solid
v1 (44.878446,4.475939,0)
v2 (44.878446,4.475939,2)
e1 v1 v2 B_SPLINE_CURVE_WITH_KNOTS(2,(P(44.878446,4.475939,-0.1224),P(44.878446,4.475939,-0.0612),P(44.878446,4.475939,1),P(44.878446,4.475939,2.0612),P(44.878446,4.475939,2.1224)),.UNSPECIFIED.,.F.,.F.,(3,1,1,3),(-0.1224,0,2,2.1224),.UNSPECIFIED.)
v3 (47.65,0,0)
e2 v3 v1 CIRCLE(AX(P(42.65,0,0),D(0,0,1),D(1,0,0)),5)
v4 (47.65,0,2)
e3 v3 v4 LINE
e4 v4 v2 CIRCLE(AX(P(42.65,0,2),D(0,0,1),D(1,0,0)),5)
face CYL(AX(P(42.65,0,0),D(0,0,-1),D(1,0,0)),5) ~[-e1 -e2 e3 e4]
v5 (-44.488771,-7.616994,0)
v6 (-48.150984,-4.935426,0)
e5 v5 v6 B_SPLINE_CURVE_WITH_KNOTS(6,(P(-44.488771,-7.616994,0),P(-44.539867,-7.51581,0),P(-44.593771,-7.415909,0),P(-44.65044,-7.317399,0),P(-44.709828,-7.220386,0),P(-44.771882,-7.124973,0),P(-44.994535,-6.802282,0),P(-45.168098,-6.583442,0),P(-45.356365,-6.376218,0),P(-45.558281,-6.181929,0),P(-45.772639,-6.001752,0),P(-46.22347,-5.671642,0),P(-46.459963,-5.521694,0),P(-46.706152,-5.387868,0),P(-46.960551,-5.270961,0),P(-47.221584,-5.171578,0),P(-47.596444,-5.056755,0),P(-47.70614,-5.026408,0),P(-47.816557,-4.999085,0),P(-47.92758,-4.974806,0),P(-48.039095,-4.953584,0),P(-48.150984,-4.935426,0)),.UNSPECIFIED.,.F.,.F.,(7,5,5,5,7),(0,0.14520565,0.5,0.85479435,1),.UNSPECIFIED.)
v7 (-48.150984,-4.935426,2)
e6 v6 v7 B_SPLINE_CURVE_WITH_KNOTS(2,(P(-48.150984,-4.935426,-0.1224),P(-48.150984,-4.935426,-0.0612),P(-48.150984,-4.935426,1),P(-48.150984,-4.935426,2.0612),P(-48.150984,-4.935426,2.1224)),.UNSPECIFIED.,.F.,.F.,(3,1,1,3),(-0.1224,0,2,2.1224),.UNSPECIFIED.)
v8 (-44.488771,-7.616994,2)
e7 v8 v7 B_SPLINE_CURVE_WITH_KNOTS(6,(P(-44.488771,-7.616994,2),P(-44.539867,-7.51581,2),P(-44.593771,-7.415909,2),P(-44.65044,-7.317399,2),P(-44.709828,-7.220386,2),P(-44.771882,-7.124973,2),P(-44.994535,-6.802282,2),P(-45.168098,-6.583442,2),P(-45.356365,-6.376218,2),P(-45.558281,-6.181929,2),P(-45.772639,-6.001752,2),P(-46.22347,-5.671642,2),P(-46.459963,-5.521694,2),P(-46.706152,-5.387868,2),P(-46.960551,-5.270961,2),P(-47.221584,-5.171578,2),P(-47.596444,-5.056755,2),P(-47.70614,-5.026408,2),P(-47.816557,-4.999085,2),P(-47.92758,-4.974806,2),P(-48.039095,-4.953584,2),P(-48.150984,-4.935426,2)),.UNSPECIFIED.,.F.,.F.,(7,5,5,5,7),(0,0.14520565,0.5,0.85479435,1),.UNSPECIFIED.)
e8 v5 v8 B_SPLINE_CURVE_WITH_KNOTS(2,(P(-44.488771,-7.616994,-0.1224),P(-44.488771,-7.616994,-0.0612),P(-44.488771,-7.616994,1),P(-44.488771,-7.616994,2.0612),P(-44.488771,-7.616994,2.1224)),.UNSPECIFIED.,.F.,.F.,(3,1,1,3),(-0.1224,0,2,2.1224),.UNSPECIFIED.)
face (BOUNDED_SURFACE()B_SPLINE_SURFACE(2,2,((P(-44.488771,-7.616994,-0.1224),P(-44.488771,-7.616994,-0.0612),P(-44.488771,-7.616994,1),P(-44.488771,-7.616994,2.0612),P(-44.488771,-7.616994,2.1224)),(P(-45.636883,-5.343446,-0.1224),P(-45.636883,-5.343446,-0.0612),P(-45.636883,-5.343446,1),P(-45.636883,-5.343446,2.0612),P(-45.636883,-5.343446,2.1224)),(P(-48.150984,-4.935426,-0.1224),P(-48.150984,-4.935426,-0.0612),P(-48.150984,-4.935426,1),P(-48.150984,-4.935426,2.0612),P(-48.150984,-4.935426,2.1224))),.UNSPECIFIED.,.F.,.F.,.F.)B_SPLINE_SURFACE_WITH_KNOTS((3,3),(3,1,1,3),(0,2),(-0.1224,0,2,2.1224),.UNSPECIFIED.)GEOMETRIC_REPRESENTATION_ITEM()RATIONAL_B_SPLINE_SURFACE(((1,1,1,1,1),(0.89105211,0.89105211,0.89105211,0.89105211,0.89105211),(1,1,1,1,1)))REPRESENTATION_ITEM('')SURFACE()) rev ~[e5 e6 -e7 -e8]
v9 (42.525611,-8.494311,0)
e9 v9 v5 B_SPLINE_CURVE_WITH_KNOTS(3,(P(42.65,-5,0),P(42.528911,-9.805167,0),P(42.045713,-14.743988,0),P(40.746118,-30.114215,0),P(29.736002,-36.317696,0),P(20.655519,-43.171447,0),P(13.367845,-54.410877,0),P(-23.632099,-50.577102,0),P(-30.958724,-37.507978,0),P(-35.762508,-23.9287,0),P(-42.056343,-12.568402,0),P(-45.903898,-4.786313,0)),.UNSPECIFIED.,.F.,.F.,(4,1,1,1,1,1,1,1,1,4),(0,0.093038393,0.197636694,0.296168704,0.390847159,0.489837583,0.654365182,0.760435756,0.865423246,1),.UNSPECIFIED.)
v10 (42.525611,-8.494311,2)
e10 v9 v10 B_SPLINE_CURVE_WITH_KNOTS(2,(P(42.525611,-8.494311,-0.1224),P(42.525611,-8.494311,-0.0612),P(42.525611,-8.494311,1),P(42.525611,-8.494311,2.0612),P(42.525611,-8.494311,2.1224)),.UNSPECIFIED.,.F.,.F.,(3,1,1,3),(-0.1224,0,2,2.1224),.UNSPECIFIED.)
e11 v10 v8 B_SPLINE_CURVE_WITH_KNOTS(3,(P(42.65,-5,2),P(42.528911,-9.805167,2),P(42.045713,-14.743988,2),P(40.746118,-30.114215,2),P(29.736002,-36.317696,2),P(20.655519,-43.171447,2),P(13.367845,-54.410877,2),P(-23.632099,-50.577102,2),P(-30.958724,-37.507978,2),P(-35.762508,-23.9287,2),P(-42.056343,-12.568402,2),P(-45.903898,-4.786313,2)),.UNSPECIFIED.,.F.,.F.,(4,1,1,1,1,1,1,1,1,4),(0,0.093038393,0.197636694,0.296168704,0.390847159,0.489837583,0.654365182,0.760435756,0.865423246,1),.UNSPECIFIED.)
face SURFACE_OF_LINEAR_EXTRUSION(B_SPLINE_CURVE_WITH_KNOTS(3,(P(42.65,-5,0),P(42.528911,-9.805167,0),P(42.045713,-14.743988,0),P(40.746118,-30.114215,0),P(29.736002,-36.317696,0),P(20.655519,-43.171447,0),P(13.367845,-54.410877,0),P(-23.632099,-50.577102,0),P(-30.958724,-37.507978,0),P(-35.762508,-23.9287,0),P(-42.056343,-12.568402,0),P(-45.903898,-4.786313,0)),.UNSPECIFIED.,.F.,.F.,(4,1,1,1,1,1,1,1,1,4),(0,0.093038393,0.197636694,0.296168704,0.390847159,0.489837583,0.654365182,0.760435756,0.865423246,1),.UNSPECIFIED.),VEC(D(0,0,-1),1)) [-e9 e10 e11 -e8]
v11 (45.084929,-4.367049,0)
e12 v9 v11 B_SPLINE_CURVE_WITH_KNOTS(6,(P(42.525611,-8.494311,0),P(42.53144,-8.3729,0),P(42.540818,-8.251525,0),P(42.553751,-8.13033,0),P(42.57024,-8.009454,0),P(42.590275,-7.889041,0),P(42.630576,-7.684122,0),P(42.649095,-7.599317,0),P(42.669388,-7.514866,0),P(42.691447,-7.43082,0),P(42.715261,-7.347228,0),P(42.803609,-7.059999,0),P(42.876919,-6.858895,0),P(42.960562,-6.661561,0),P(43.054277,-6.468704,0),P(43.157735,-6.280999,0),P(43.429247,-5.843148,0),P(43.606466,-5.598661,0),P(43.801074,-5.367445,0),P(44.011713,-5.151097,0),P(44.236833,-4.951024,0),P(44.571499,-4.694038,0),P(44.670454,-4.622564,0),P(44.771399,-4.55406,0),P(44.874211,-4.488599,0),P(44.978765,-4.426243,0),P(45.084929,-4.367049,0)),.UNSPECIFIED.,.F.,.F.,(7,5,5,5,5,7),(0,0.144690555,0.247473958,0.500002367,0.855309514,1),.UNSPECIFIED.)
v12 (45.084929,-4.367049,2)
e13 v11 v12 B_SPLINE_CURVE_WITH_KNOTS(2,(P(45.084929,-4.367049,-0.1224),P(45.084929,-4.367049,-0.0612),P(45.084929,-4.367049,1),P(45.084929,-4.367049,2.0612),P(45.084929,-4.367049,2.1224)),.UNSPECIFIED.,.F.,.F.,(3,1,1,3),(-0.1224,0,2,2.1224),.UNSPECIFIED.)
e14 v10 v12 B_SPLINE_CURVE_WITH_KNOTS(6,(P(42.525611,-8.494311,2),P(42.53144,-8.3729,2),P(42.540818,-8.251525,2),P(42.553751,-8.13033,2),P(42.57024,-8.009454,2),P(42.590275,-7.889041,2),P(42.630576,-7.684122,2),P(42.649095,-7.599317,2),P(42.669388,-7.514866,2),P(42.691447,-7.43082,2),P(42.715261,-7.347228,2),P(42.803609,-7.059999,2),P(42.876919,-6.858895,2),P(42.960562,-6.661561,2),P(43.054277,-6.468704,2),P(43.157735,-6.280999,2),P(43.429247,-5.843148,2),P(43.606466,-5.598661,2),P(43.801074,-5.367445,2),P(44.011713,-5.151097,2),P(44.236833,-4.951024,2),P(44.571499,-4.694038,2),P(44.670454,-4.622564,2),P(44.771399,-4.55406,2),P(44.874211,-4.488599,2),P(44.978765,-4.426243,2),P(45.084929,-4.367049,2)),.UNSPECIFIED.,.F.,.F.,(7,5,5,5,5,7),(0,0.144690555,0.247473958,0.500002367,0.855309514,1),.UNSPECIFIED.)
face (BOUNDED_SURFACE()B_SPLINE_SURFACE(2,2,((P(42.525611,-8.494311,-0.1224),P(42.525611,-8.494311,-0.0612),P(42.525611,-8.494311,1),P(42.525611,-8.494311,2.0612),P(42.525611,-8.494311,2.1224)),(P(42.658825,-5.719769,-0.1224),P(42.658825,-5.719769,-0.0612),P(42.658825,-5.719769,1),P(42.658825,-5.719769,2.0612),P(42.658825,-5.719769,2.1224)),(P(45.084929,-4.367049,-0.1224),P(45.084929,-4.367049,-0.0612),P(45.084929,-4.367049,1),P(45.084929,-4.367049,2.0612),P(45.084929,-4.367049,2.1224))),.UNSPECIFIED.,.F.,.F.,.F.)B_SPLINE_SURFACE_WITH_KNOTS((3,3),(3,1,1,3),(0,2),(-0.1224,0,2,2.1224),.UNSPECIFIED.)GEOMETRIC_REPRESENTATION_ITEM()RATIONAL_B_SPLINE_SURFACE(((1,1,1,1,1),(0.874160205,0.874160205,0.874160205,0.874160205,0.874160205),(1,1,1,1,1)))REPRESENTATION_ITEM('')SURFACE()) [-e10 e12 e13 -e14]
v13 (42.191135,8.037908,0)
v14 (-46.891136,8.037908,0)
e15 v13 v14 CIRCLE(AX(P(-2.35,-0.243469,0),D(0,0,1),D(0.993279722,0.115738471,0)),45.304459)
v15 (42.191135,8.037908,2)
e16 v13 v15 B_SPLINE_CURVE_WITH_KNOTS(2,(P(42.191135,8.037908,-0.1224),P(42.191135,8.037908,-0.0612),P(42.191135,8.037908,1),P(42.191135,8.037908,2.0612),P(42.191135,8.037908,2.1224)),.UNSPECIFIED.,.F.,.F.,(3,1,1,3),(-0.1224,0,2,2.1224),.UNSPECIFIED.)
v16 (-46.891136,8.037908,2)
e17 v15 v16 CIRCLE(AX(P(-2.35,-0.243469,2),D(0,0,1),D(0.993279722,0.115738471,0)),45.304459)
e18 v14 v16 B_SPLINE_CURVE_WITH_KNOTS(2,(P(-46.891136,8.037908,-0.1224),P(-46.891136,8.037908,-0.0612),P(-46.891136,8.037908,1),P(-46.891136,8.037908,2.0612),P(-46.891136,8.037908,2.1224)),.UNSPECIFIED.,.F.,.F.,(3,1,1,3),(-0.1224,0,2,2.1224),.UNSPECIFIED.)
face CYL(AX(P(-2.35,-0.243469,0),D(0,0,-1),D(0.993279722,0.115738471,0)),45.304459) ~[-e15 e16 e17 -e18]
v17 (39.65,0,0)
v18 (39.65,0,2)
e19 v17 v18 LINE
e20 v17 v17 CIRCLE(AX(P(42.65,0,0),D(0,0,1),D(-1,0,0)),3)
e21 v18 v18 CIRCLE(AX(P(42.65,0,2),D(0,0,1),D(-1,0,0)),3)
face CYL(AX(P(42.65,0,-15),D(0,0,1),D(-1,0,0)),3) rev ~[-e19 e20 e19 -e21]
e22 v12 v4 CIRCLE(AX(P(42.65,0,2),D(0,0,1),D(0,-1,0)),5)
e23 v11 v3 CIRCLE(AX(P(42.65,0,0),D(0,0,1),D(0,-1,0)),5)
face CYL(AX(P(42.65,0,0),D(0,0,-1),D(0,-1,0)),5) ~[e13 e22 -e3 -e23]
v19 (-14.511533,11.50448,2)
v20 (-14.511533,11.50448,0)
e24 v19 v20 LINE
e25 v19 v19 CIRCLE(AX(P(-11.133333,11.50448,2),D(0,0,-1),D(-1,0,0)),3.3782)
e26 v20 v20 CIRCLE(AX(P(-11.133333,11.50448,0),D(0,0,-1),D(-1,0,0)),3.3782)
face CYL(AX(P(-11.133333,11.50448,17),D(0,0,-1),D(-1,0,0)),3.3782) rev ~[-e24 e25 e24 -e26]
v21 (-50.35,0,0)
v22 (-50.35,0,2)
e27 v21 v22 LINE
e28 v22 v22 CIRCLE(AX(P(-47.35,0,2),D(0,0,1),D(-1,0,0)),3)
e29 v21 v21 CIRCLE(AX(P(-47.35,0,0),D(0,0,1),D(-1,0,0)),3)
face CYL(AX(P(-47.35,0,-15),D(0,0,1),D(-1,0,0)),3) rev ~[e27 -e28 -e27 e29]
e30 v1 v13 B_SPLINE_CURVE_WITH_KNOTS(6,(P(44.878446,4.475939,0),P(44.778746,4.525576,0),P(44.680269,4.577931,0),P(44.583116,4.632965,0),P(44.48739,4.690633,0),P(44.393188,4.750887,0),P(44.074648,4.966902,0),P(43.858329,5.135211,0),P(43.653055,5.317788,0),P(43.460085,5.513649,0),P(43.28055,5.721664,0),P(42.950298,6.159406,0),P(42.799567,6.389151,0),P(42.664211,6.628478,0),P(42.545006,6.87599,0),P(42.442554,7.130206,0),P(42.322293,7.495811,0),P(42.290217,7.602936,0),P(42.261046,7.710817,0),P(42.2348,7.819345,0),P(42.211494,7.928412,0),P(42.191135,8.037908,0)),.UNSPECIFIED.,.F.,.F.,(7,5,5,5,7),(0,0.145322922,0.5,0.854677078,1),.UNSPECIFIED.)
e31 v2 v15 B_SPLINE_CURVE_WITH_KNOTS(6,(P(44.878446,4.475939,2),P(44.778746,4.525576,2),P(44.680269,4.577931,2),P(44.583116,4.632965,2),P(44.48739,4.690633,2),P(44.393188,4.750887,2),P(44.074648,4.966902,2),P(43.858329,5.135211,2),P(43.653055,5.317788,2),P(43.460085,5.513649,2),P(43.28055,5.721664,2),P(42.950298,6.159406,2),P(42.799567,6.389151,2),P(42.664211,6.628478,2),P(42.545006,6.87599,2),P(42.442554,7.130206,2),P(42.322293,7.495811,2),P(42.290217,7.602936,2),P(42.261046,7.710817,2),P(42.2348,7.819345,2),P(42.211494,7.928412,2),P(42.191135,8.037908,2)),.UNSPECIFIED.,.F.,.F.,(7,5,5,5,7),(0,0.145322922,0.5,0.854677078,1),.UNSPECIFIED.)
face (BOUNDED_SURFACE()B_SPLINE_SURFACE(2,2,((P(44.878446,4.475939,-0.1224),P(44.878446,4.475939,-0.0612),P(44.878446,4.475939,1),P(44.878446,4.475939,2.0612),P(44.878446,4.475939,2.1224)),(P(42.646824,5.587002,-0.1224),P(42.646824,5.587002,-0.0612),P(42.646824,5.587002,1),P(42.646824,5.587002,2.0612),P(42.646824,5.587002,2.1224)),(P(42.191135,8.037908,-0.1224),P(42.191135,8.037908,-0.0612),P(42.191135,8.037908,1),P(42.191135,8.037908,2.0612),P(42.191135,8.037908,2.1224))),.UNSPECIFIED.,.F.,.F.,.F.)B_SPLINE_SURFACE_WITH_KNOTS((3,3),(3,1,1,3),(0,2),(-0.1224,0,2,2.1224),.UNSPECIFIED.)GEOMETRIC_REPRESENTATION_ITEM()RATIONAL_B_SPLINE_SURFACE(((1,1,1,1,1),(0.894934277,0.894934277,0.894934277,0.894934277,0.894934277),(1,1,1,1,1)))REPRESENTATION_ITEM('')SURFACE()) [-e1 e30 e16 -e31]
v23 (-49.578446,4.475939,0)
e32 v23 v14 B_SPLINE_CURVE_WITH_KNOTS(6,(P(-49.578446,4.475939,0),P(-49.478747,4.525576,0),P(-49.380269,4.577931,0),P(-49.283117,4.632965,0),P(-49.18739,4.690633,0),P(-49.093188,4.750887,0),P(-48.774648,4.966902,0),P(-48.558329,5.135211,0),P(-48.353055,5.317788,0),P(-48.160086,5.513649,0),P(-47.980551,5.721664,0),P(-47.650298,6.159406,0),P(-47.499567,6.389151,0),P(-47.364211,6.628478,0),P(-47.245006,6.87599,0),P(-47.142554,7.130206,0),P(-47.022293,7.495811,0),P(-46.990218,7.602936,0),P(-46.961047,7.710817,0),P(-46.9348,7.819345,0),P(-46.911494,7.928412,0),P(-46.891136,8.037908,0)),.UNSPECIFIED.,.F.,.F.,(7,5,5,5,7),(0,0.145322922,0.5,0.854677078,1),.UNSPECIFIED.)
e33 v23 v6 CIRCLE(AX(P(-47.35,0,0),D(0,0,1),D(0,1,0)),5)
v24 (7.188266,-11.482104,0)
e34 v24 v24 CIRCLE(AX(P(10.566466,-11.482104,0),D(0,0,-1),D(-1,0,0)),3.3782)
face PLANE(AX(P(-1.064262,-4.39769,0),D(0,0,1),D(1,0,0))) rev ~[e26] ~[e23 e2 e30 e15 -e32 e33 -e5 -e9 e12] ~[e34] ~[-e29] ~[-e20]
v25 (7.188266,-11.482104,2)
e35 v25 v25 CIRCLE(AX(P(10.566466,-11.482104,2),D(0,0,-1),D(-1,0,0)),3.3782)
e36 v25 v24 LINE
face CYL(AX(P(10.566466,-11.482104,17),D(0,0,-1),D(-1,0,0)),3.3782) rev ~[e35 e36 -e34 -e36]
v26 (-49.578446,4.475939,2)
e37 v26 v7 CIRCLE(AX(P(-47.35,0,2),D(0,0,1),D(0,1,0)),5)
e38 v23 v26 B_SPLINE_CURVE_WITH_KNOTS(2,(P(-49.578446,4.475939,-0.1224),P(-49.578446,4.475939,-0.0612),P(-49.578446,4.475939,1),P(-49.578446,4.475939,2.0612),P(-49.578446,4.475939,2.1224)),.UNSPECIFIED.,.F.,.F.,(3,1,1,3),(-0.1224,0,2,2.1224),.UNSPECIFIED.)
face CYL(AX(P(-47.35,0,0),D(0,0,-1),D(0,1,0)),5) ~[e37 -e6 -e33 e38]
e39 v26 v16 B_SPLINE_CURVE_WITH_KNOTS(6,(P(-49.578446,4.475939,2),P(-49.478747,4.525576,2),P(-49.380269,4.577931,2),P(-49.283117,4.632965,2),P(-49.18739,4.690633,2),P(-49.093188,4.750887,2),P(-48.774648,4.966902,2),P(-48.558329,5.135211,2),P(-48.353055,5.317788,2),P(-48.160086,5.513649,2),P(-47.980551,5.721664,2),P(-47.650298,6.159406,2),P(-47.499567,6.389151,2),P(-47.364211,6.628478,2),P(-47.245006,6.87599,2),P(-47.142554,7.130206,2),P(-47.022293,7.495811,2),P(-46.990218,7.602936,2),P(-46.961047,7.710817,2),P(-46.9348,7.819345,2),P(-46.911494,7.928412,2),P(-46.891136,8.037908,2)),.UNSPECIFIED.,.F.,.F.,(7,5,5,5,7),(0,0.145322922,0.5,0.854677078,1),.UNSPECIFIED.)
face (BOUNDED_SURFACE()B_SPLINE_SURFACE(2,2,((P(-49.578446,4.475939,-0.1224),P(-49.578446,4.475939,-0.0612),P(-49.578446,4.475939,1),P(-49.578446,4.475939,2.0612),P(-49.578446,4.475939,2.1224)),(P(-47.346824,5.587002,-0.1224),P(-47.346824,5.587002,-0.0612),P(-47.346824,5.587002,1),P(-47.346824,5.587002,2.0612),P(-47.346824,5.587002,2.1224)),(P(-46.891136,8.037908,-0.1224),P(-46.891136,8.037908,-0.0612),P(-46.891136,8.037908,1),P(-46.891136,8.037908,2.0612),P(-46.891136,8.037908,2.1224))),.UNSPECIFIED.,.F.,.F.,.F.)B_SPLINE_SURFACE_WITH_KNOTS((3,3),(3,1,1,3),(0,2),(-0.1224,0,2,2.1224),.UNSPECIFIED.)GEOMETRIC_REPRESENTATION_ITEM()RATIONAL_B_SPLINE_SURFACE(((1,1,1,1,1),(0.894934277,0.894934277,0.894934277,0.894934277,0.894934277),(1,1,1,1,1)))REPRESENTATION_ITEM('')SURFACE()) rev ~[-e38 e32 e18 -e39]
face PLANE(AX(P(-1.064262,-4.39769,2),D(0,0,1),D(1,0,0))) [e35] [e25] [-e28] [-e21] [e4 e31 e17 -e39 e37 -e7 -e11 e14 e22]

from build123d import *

# Parameters (mm, degrees)
F1_DEPTH = 2
F2_D     = 6
F2_DEPTH = 15
F2_TIP   = 1.8025818571
F3_R     = 5
F5_D     = 6.7564
F5_DEPTH = 15
F5_TIP   = 2.0298273432


# Not quite as in the source:
# - a feature names something its author has since deleted; it is built from what else it names


with BuildPart() as f1:
    # F0 (on Top) → F1 (new body)
    with BuildSketch(Plane.XY):
        with BuildLine():
            ThreePointArc((-47.3500001504, 5), (-43.8144662445, 3.5355339059), (-42.3500001504, 0))
            ThreePointArc((-42.3500001504, 0), (-43.3356192267, -2.9807290717), (-45.90389847, -4.7863127698))
            add(Edge.make_bspline(
                [(42.6499998496, -5), (42.5289111679, -9.8051674108), (42.0457129188, -14.7439877194), (40.7461175667, -30.1142148215), (29.7360021605, -36.317695818), (20.6555192756, -43.1714469496), (13.3678454871, -54.4108770899), (-23.6320989357, -50.5771015914), (-30.9587242182, -37.5079780838), (-35.7625076425, -23.9287004601), (-42.056342597, -12.5684016954), (-45.90389847, -4.7863127698)],
                knots=[0, 0, 0, 0, 0.0930383933, 0.1976366945, 0.2961687037, 0.3908471592, 0.4898375832, 0.6543651822, 0.7604357564, 0.8654232461, 1, 1, 1, 1], degree=3))
            ThreePointArc((42.6499998496, -5), (37.6499998496, 0), (42.6499998496, 5))
            ThreePointArc((42.6499998496, 5), (-2.3500001504, 45.0609898081), (-47.3500001504, 5))
        make_face()
        with BuildLine():
            ThreePointArc((-45.90389847, -4.7863127698), (-43.3356192267, -2.9807290717), (-42.3500001504, 0))
            ThreePointArc((-42.3500001504, 0), (-43.8144662445, 3.5355339059), (-47.3500001504, 5))
            ThreePointArc((-47.3500001504, 5), (-52.2962898634, -0.730902234), (-45.90389847, -4.7863127698))
        make_face()
        with BuildLine():
            ThreePointArc((47.6499998496, 0), (46.1855337555, 3.5355339059), (42.6499998496, 5))
            ThreePointArc((42.6499998496, 5), (37.6499998496, 0), (42.6499998496, -5))
            ThreePointArc((42.6499998496, -5), (46.1855337555, -3.5355339059), (47.6499998496, 0))
        make_face()
    extrude(amount=F1_DEPTH)

    # F2
    with Locations(Plane(origin=(0, 0, 0), x_dir=(1, 0, 0), z_dir=(0, 0, -1))):
        with Locations((-47.3500001504, 0), (42.6499998496, 0)):
            Hole(F2_D / 2, depth=F2_DEPTH)
            with Locations((0, 0, -(F2_DEPTH + F2_TIP / 2))):  # 118° drill point
                Cone(0, F2_D / 2, F2_TIP, mode=Mode.SUBTRACT)

    # F3
    f3_edges = [f1.edges().sort_by_distance(p)[0] for p in [
        (-47.35, 5, 1),
        (-45.903898, -4.786313, 1),
        (42.65, 5, 1),
        (42.65, -5, 1),
    ]]
    fillet(f3_edges, radius=F3_R)

    # F5
    with Locations(Plane.XY.offset(2)):
        with Locations((-11.1333334838, 11.5044798038), (10.5664664879, -11.4821037278)):
            Hole(F5_D / 2, depth=F5_DEPTH)
            with Locations((0, 0, -(F5_DEPTH + F5_TIP / 2))):  # 118° drill point
                Cone(0, F5_D / 2, F5_TIP, mode=Mode.SUBTRACT)


solid = f1.part
